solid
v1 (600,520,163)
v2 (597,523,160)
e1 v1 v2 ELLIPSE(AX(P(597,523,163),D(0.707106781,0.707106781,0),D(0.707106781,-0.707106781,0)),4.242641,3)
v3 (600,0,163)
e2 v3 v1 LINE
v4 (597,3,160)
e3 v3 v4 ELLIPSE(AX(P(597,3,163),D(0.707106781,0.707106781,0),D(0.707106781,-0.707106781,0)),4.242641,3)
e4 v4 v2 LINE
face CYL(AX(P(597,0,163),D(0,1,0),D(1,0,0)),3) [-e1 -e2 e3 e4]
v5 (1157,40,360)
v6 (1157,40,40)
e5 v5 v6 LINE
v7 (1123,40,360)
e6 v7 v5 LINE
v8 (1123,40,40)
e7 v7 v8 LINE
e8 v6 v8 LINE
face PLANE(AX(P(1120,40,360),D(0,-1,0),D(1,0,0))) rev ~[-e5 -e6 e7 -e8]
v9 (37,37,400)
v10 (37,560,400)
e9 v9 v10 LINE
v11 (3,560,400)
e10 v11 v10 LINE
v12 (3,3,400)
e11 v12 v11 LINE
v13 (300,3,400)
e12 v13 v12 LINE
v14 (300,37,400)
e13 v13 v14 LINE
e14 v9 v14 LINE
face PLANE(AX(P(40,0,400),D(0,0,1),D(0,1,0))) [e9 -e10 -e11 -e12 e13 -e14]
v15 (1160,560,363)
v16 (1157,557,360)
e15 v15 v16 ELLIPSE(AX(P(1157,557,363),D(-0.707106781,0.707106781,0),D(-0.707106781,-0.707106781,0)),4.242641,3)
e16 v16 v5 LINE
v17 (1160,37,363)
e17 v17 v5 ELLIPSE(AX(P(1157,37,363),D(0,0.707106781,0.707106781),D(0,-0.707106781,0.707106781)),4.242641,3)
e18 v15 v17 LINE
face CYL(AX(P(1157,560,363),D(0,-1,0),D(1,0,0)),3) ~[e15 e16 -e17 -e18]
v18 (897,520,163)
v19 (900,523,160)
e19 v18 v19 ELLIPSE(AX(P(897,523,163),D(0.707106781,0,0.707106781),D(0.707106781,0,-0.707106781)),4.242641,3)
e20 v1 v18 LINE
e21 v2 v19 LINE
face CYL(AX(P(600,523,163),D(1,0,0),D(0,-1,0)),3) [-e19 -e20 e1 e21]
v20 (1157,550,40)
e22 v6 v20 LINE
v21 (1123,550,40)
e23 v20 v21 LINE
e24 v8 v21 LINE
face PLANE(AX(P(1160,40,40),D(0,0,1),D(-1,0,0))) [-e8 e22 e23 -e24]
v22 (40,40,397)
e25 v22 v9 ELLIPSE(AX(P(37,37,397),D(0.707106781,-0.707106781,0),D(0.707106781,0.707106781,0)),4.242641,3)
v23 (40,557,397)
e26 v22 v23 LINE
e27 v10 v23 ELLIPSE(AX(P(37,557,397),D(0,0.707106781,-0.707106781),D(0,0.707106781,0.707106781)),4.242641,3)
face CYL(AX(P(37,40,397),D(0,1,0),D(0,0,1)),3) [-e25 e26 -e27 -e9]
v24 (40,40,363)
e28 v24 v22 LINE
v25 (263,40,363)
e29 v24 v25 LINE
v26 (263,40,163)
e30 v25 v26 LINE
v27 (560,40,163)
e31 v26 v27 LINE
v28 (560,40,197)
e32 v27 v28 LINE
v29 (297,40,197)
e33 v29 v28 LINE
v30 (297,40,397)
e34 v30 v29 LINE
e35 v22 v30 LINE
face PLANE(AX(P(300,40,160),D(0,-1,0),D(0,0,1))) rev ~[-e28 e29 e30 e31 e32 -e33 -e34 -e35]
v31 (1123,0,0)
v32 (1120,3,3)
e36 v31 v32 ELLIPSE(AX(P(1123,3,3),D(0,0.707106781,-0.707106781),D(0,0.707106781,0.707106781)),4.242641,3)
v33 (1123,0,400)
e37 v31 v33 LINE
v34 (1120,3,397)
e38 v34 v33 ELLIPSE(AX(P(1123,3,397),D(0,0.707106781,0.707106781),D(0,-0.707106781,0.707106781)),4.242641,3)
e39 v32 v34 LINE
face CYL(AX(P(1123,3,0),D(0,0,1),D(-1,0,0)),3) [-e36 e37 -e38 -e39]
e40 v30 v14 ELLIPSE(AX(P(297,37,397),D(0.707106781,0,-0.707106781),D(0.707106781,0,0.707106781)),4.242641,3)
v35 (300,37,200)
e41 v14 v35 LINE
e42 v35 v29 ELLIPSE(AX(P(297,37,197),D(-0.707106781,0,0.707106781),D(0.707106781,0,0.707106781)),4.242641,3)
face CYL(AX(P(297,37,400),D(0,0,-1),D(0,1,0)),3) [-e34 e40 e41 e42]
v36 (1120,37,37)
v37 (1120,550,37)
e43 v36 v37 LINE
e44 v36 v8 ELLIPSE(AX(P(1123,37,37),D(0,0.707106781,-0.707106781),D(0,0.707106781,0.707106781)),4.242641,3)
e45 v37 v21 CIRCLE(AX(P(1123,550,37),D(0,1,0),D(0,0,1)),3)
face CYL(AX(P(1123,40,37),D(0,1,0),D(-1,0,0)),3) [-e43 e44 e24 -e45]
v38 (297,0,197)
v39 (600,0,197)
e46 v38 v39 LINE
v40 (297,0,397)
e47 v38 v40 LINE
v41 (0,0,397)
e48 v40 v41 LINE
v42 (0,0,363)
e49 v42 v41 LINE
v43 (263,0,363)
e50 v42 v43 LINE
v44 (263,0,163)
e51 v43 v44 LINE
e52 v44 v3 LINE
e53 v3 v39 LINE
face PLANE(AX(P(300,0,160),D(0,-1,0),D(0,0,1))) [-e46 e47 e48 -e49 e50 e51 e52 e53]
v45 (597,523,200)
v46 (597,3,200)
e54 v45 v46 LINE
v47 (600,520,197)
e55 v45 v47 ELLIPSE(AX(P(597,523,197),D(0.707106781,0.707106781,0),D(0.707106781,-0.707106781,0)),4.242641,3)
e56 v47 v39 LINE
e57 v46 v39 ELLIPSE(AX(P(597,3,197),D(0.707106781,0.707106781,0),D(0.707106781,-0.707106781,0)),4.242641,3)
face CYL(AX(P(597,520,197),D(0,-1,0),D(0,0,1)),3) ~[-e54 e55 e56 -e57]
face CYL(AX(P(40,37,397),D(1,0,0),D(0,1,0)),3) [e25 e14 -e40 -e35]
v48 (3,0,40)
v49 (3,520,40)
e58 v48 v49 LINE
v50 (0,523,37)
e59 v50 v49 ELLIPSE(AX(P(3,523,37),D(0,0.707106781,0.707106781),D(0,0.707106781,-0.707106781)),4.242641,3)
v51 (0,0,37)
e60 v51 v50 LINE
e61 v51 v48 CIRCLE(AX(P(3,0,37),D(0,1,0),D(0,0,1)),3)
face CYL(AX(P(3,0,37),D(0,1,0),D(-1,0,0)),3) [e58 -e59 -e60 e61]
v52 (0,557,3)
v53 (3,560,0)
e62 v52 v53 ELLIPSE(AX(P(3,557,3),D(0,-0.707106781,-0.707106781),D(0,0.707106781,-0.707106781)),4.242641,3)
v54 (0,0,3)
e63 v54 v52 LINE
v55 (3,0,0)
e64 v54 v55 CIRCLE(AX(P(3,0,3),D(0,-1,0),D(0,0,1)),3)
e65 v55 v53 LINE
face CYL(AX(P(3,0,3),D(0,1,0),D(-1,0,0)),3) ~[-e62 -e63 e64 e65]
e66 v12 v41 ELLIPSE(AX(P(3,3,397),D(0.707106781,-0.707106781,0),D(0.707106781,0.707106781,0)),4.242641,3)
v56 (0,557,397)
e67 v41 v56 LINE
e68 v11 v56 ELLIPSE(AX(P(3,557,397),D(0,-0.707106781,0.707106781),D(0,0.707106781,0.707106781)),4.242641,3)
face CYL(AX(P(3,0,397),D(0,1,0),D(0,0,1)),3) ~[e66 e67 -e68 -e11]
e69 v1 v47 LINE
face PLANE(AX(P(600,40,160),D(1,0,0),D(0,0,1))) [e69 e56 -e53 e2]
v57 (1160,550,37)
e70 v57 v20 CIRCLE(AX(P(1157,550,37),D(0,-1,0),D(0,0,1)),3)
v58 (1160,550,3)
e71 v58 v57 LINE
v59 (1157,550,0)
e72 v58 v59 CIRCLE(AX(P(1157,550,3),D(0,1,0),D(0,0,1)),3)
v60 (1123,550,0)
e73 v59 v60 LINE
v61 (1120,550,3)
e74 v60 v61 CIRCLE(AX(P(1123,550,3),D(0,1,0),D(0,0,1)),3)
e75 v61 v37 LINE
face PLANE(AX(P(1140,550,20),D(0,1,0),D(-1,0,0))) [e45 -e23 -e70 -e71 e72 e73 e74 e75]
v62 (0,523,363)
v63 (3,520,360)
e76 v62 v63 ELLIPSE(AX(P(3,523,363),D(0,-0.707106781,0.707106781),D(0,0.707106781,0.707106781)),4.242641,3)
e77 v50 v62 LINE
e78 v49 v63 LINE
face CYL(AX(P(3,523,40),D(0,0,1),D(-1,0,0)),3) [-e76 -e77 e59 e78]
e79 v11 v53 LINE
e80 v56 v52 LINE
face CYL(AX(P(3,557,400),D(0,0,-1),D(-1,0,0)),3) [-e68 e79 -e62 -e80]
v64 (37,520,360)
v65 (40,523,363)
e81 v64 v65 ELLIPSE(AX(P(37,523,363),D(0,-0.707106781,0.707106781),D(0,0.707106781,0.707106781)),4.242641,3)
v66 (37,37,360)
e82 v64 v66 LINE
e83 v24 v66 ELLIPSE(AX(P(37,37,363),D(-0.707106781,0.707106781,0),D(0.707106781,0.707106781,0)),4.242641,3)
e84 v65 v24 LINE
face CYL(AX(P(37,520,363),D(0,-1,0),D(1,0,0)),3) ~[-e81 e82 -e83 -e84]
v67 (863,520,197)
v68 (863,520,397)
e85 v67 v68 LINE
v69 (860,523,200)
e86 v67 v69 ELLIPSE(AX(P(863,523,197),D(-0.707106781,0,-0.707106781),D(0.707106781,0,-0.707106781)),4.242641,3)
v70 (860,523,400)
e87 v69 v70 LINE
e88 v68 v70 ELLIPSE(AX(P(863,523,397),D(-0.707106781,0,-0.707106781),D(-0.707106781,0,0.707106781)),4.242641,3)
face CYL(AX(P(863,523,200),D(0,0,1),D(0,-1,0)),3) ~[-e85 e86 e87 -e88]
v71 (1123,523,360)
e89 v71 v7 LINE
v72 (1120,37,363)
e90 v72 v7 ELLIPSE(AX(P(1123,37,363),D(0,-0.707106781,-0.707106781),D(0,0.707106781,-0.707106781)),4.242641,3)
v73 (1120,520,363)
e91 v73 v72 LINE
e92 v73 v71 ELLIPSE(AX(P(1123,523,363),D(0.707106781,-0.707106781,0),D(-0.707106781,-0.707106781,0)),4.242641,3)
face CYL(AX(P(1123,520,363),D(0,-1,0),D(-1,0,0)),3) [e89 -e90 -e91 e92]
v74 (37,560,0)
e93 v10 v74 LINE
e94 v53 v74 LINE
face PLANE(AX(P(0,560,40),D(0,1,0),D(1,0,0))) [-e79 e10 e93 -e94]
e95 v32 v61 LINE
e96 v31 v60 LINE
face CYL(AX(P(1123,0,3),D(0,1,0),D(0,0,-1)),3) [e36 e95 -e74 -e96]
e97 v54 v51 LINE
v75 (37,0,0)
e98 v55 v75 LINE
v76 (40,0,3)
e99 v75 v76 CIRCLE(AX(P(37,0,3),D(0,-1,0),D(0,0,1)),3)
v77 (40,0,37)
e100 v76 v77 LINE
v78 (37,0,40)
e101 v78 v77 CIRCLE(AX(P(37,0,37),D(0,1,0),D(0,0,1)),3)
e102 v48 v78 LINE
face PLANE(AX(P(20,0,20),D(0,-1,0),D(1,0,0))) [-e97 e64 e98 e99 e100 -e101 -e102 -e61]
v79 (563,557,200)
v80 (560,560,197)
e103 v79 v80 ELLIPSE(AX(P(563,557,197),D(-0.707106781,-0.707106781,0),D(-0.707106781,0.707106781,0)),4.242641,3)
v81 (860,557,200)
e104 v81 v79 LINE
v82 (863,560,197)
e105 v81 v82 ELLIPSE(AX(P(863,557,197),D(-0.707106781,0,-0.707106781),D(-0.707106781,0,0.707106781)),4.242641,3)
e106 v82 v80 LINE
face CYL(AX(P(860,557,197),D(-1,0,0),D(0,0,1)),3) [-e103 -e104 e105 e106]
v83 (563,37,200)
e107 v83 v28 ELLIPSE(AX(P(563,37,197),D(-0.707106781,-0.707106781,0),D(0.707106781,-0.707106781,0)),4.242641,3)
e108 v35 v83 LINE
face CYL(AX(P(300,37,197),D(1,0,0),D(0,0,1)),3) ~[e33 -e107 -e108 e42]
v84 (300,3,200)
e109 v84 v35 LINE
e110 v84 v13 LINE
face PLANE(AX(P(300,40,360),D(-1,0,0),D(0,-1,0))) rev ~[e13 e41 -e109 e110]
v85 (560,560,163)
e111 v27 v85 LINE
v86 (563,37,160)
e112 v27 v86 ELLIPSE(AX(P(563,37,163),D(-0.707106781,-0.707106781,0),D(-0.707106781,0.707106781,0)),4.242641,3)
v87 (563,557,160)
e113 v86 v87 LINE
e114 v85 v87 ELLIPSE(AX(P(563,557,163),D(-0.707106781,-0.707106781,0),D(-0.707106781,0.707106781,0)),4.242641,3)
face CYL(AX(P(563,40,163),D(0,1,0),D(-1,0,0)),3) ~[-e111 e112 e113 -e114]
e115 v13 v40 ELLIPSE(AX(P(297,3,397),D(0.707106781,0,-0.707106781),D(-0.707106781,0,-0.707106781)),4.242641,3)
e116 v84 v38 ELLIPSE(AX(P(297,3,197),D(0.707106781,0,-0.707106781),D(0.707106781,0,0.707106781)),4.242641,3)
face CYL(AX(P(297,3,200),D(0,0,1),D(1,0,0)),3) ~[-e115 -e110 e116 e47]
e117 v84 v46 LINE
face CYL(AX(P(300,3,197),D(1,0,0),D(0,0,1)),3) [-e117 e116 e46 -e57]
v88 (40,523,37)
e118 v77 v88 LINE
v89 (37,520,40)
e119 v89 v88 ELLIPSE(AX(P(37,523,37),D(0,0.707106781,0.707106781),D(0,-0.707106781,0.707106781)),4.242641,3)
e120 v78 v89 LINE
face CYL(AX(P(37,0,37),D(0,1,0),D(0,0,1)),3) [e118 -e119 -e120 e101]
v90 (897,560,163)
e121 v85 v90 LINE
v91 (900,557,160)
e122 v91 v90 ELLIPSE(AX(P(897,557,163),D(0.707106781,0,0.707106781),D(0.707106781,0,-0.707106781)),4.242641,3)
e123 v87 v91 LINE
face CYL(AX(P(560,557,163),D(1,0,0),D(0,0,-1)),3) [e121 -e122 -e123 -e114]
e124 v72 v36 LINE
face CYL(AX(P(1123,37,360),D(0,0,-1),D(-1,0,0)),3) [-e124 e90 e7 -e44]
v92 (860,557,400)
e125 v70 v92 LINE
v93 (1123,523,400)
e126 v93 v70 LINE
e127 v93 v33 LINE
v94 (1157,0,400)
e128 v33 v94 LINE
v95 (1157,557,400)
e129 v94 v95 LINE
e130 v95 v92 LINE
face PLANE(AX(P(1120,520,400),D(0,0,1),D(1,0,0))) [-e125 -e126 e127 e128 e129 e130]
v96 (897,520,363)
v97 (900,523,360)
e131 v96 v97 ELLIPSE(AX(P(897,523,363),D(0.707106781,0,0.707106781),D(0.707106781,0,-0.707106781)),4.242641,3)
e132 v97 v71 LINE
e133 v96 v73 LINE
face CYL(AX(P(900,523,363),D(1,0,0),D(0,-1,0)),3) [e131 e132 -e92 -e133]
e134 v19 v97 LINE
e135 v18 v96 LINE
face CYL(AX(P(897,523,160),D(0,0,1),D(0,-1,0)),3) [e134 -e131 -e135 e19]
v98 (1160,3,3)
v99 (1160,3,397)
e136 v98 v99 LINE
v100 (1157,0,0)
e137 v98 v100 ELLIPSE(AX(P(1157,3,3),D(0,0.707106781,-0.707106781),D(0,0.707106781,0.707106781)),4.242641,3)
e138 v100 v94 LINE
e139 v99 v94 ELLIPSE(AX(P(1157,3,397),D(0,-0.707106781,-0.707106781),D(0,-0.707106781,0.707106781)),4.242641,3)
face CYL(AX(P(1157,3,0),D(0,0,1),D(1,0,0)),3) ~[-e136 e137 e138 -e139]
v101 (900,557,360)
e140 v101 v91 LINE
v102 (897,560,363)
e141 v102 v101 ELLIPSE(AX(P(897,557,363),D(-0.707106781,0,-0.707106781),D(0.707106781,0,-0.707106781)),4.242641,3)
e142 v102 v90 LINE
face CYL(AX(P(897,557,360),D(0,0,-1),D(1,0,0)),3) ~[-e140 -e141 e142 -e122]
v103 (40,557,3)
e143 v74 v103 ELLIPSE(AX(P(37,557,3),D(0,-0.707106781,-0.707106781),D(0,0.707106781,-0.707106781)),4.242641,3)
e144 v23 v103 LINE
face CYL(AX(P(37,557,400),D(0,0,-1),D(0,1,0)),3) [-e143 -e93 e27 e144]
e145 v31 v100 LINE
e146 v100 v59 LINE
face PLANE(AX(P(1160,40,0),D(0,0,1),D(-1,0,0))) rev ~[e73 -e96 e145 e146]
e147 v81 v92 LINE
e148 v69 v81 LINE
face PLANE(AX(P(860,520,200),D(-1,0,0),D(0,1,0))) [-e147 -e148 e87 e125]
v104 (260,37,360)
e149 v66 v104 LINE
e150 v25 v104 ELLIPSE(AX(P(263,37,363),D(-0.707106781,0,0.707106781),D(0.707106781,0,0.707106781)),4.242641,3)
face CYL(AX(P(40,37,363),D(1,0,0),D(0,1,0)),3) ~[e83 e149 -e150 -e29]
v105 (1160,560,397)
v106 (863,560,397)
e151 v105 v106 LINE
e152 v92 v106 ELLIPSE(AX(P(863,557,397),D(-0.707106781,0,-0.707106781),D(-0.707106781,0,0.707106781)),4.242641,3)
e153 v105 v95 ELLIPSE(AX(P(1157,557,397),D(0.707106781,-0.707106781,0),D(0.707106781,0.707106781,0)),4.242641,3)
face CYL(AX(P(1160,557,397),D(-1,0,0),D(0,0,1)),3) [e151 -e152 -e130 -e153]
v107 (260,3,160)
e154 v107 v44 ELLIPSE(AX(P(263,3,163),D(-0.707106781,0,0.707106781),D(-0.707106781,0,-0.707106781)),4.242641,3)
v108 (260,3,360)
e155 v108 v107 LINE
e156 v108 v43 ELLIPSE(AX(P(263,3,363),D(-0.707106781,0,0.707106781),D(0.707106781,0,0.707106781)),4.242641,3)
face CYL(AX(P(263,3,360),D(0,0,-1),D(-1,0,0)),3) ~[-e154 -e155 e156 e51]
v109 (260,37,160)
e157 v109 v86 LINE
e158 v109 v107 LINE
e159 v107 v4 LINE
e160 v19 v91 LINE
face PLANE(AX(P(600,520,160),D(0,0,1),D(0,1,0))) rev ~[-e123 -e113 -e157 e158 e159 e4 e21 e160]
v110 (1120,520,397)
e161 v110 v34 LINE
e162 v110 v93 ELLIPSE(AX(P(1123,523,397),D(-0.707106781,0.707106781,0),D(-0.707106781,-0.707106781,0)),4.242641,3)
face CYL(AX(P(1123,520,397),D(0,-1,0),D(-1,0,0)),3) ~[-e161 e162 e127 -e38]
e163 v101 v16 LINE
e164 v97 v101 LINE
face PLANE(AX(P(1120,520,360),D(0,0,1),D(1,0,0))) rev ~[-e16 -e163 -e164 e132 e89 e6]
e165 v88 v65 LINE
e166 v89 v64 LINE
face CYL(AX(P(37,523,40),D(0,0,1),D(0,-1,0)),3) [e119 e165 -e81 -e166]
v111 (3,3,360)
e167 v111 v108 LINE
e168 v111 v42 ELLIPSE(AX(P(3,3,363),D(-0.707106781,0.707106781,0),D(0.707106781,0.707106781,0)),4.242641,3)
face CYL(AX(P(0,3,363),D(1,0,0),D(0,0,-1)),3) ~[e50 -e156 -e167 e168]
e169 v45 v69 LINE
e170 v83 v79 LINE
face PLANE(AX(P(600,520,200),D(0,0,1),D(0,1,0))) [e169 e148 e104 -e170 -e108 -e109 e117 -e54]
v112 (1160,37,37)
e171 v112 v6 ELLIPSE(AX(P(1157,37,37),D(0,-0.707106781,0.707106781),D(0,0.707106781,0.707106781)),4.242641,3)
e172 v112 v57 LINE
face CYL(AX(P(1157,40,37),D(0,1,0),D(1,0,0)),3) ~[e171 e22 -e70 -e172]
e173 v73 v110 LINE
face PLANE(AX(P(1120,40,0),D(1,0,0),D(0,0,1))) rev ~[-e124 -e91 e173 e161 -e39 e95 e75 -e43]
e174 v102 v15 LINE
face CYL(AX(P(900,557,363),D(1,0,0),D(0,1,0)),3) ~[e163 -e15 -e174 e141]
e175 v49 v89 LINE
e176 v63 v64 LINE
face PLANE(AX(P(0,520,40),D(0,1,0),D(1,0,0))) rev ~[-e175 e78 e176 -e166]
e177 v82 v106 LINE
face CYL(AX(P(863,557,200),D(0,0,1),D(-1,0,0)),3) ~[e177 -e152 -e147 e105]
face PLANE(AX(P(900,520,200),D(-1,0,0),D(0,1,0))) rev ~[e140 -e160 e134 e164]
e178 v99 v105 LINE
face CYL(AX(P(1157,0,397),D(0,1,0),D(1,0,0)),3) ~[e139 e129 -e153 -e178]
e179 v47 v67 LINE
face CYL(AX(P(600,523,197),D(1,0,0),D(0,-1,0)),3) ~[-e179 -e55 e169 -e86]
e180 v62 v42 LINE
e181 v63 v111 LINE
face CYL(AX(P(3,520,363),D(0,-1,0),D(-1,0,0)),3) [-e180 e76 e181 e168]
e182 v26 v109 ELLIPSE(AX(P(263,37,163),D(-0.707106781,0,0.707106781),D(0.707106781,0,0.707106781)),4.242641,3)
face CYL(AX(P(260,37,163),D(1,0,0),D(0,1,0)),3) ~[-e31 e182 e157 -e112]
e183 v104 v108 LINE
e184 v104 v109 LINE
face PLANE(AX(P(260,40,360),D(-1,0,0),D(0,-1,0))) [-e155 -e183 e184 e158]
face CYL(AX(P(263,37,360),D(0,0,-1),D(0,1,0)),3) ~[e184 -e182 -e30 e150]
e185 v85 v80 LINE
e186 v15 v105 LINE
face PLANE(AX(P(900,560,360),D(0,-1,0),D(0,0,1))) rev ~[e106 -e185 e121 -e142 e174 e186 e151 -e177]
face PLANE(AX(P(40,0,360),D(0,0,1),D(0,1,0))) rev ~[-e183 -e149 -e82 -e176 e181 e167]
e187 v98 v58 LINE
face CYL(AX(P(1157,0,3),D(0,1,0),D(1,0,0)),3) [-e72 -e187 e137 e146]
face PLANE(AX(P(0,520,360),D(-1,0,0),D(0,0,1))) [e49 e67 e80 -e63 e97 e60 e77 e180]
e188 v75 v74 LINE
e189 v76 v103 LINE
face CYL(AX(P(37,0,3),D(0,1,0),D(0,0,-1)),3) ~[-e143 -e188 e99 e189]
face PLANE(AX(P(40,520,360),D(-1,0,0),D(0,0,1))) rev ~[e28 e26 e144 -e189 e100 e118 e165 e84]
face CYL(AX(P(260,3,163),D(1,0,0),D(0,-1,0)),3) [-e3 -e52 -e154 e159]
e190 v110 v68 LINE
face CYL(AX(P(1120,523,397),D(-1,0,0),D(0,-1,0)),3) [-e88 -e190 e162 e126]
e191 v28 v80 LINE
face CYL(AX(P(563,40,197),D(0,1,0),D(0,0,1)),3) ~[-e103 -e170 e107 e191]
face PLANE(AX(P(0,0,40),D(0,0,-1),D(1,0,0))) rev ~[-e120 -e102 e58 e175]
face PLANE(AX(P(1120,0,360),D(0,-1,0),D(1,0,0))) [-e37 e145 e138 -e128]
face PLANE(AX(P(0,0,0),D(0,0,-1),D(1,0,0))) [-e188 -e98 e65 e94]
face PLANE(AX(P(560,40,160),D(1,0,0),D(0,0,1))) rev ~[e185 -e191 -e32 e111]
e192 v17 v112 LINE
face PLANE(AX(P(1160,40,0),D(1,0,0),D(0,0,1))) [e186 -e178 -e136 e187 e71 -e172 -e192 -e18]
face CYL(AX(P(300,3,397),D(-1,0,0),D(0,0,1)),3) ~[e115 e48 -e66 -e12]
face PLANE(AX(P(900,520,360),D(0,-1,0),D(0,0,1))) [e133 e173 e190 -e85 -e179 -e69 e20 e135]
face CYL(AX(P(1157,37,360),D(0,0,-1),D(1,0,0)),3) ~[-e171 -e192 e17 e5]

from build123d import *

# Parameters (mm, degrees)
F0_W      = 40
F0_H      = 40
F1_DEPTH  = 560
F2_W      = 40
F2_H      = 40
F3_DEPTH  = 360
F4_W      = 40
F4_H      = 40
F5_DEPTH  = 520
F6_W      = 40
F6_H      = 40
F7_DEPTH  = 260
F8_W      = 40
F8_H      = 40
F9_DEPTH  = 200
F10_W     = 40
F10_H     = 40
F11_DEPTH = 300
F12_W     = 40
F12_H     = 40
F13_DEPTH = 520
F14_W     = 40
F14_H     = 40
F15_DEPTH = 300
F16_W     = 40
F16_H     = 40
F17_DEPTH = 200
F18_W     = 40
F18_H     = 40
F19_DEPTH = 260
F20_W     = 40
F20_H     = 40
F21_DEPTH = 520
F22_W     = 40
F22_H     = 40
F23_DEPTH = 360
F24_W     = 40
F24_H     = 40
F25_DEPTH = 510
F26_R     = 3


with BuildPart() as f1:
    # F0 (on Front) → F1 (new body)
    with BuildSketch(Plane.XZ):
        with Locations((20, 20)):
            Rectangle(F0_W, F0_H)
    extrude(amount=-F1_DEPTH)

    # F2 (on face) → F3 (join)
    with BuildSketch(Plane.XY.offset(40)):
        with Locations((20, 540)):
            Rectangle(F2_W, F2_H)
    extrude(amount=F3_DEPTH)

    # F4 (on face) → F5 (join)
    with BuildSketch(Plane.XZ.offset(-520)):
        with Locations((20, 380)):
            Rectangle(F4_W, F4_H)
    extrude(amount=F5_DEPTH)

    # F6 (on face) → F7 (join)
    with BuildSketch(Plane.YZ.offset(40)):
        with Locations((20, 380)):
            Rectangle(F6_W, F6_H)
    extrude(amount=F7_DEPTH)

    # F8 (on face) → F9 (join)
    with BuildSketch(Plane(origin=(0, 0, 360), x_dir=(1, 0, 0), z_dir=(0, 0, -1))):
        with Locations((280, -20)):
            Rectangle(F8_W, F8_H)
    extrude(amount=F9_DEPTH)

    # F10 (on face) → F11 (join)
    with BuildSketch(Plane.YZ.offset(300)):
        with Locations((20, 180)):
            Rectangle(F10_W, F10_H)
    extrude(amount=F11_DEPTH)

    # F12 (on face) → F13 (join)
    with BuildSketch(Plane(origin=(0, 40, 0), x_dir=(-1, 0, 0), z_dir=(0, 1, 0))):
        with Locations((-580, 180)):
            Rectangle(F12_W, F12_H)
    extrude(amount=F13_DEPTH)

    # F14 (on face) → F15 (join)
    with BuildSketch(Plane.YZ.offset(600)):
        with Locations((540, 180)):
            Rectangle(F14_W, F14_H)
    extrude(amount=F15_DEPTH)

    # F16 (on face) → F17 (join)
    with BuildSketch(Plane.XY.offset(200)):
        with Locations((880, 540)):
            Rectangle(F16_W, F16_H)
    extrude(amount=F17_DEPTH)

    # F18 (on face) → F19 (join)
    with BuildSketch(Plane.YZ.offset(900)):
        with Locations((540, 380)):
            Rectangle(F18_W, F18_H)
    extrude(amount=F19_DEPTH)

    # F20 (on face) → F21 (join)
    with BuildSketch(Plane.XZ.offset(-520)):
        with Locations((1140, 380)):
            Rectangle(F20_W, F20_H)
    extrude(amount=F21_DEPTH)

    # F22 (on face) → F23 (join)
    with BuildSketch(Plane(origin=(0, 0, 360), x_dir=(1, 0, 0), z_dir=(0, 0, -1))):
        with Locations((1140, -20)):
            Rectangle(F22_W, F22_H)
    extrude(amount=F23_DEPTH)

    # F24 (on face) → F25 (join)
    with BuildSketch(Plane(origin=(0, 40, 0), x_dir=(-1, 0, 0), z_dir=(0, 1, 0))):
        with Locations((-1140, 20)):
            Rectangle(F24_W, F24_H)
    extrude(amount=F25_DEPTH)

    # F26
    f26_edges = [f1.edges().sort_by_distance(p)[0] for p in [
        (0, 280, 400),
        (150, 0, 400),
        (170, 40, 400),
        (40, 300, 400),
        (0, 260, 40),
        (130, 0, 360),
        (260, 0, 260),
        (300, 0, 300),
        (430, 40, 200),
        (450, 0, 200),
        (430, 0, 160),
        (40, 520, 200),
        (0, 560, 200),
        (0, 280, 0),
        (40, 260, 40),
        (560, 300, 200),
        (600, 260, 200),
        (710, 560, 200),
        (730, 520, 200),
        (750, 520, 160),
        (560, 300, 160),
        (1120, 275, 0),
        (1160, 295, 40),
        (1120, 295, 40),
        (1120, 40, 200),
        (1160, 0, 200),
        (1120, 0, 200),
        (1120, 280, 360),
        (1160, 280, 400),
        (1120, 260, 400),
        (1010, 560, 400),
        (990, 520, 400),
        (1010, 520, 360),
        (900, 520, 260),
        (860, 520, 300),
        (860, 560, 300),
        (1160, 300, 360),
        (1160, 275, 0),
        (1030, 560, 360),
        (730, 560, 160),
        (900, 560, 260),
        (600, 260, 160),
        (410, 40, 160),
        (150, 40, 360),
        (300, 40, 300),
        (1160, 40, 200),
        (40, 560, 200),
        (40, 280, 0),
        (0, 520, 200),
        (0, 260, 360),
        (40, 280, 360),
        (260, 40, 260),
    ]]
    fillet(f26_edges, radius=F26_R)


solid = f1.part
